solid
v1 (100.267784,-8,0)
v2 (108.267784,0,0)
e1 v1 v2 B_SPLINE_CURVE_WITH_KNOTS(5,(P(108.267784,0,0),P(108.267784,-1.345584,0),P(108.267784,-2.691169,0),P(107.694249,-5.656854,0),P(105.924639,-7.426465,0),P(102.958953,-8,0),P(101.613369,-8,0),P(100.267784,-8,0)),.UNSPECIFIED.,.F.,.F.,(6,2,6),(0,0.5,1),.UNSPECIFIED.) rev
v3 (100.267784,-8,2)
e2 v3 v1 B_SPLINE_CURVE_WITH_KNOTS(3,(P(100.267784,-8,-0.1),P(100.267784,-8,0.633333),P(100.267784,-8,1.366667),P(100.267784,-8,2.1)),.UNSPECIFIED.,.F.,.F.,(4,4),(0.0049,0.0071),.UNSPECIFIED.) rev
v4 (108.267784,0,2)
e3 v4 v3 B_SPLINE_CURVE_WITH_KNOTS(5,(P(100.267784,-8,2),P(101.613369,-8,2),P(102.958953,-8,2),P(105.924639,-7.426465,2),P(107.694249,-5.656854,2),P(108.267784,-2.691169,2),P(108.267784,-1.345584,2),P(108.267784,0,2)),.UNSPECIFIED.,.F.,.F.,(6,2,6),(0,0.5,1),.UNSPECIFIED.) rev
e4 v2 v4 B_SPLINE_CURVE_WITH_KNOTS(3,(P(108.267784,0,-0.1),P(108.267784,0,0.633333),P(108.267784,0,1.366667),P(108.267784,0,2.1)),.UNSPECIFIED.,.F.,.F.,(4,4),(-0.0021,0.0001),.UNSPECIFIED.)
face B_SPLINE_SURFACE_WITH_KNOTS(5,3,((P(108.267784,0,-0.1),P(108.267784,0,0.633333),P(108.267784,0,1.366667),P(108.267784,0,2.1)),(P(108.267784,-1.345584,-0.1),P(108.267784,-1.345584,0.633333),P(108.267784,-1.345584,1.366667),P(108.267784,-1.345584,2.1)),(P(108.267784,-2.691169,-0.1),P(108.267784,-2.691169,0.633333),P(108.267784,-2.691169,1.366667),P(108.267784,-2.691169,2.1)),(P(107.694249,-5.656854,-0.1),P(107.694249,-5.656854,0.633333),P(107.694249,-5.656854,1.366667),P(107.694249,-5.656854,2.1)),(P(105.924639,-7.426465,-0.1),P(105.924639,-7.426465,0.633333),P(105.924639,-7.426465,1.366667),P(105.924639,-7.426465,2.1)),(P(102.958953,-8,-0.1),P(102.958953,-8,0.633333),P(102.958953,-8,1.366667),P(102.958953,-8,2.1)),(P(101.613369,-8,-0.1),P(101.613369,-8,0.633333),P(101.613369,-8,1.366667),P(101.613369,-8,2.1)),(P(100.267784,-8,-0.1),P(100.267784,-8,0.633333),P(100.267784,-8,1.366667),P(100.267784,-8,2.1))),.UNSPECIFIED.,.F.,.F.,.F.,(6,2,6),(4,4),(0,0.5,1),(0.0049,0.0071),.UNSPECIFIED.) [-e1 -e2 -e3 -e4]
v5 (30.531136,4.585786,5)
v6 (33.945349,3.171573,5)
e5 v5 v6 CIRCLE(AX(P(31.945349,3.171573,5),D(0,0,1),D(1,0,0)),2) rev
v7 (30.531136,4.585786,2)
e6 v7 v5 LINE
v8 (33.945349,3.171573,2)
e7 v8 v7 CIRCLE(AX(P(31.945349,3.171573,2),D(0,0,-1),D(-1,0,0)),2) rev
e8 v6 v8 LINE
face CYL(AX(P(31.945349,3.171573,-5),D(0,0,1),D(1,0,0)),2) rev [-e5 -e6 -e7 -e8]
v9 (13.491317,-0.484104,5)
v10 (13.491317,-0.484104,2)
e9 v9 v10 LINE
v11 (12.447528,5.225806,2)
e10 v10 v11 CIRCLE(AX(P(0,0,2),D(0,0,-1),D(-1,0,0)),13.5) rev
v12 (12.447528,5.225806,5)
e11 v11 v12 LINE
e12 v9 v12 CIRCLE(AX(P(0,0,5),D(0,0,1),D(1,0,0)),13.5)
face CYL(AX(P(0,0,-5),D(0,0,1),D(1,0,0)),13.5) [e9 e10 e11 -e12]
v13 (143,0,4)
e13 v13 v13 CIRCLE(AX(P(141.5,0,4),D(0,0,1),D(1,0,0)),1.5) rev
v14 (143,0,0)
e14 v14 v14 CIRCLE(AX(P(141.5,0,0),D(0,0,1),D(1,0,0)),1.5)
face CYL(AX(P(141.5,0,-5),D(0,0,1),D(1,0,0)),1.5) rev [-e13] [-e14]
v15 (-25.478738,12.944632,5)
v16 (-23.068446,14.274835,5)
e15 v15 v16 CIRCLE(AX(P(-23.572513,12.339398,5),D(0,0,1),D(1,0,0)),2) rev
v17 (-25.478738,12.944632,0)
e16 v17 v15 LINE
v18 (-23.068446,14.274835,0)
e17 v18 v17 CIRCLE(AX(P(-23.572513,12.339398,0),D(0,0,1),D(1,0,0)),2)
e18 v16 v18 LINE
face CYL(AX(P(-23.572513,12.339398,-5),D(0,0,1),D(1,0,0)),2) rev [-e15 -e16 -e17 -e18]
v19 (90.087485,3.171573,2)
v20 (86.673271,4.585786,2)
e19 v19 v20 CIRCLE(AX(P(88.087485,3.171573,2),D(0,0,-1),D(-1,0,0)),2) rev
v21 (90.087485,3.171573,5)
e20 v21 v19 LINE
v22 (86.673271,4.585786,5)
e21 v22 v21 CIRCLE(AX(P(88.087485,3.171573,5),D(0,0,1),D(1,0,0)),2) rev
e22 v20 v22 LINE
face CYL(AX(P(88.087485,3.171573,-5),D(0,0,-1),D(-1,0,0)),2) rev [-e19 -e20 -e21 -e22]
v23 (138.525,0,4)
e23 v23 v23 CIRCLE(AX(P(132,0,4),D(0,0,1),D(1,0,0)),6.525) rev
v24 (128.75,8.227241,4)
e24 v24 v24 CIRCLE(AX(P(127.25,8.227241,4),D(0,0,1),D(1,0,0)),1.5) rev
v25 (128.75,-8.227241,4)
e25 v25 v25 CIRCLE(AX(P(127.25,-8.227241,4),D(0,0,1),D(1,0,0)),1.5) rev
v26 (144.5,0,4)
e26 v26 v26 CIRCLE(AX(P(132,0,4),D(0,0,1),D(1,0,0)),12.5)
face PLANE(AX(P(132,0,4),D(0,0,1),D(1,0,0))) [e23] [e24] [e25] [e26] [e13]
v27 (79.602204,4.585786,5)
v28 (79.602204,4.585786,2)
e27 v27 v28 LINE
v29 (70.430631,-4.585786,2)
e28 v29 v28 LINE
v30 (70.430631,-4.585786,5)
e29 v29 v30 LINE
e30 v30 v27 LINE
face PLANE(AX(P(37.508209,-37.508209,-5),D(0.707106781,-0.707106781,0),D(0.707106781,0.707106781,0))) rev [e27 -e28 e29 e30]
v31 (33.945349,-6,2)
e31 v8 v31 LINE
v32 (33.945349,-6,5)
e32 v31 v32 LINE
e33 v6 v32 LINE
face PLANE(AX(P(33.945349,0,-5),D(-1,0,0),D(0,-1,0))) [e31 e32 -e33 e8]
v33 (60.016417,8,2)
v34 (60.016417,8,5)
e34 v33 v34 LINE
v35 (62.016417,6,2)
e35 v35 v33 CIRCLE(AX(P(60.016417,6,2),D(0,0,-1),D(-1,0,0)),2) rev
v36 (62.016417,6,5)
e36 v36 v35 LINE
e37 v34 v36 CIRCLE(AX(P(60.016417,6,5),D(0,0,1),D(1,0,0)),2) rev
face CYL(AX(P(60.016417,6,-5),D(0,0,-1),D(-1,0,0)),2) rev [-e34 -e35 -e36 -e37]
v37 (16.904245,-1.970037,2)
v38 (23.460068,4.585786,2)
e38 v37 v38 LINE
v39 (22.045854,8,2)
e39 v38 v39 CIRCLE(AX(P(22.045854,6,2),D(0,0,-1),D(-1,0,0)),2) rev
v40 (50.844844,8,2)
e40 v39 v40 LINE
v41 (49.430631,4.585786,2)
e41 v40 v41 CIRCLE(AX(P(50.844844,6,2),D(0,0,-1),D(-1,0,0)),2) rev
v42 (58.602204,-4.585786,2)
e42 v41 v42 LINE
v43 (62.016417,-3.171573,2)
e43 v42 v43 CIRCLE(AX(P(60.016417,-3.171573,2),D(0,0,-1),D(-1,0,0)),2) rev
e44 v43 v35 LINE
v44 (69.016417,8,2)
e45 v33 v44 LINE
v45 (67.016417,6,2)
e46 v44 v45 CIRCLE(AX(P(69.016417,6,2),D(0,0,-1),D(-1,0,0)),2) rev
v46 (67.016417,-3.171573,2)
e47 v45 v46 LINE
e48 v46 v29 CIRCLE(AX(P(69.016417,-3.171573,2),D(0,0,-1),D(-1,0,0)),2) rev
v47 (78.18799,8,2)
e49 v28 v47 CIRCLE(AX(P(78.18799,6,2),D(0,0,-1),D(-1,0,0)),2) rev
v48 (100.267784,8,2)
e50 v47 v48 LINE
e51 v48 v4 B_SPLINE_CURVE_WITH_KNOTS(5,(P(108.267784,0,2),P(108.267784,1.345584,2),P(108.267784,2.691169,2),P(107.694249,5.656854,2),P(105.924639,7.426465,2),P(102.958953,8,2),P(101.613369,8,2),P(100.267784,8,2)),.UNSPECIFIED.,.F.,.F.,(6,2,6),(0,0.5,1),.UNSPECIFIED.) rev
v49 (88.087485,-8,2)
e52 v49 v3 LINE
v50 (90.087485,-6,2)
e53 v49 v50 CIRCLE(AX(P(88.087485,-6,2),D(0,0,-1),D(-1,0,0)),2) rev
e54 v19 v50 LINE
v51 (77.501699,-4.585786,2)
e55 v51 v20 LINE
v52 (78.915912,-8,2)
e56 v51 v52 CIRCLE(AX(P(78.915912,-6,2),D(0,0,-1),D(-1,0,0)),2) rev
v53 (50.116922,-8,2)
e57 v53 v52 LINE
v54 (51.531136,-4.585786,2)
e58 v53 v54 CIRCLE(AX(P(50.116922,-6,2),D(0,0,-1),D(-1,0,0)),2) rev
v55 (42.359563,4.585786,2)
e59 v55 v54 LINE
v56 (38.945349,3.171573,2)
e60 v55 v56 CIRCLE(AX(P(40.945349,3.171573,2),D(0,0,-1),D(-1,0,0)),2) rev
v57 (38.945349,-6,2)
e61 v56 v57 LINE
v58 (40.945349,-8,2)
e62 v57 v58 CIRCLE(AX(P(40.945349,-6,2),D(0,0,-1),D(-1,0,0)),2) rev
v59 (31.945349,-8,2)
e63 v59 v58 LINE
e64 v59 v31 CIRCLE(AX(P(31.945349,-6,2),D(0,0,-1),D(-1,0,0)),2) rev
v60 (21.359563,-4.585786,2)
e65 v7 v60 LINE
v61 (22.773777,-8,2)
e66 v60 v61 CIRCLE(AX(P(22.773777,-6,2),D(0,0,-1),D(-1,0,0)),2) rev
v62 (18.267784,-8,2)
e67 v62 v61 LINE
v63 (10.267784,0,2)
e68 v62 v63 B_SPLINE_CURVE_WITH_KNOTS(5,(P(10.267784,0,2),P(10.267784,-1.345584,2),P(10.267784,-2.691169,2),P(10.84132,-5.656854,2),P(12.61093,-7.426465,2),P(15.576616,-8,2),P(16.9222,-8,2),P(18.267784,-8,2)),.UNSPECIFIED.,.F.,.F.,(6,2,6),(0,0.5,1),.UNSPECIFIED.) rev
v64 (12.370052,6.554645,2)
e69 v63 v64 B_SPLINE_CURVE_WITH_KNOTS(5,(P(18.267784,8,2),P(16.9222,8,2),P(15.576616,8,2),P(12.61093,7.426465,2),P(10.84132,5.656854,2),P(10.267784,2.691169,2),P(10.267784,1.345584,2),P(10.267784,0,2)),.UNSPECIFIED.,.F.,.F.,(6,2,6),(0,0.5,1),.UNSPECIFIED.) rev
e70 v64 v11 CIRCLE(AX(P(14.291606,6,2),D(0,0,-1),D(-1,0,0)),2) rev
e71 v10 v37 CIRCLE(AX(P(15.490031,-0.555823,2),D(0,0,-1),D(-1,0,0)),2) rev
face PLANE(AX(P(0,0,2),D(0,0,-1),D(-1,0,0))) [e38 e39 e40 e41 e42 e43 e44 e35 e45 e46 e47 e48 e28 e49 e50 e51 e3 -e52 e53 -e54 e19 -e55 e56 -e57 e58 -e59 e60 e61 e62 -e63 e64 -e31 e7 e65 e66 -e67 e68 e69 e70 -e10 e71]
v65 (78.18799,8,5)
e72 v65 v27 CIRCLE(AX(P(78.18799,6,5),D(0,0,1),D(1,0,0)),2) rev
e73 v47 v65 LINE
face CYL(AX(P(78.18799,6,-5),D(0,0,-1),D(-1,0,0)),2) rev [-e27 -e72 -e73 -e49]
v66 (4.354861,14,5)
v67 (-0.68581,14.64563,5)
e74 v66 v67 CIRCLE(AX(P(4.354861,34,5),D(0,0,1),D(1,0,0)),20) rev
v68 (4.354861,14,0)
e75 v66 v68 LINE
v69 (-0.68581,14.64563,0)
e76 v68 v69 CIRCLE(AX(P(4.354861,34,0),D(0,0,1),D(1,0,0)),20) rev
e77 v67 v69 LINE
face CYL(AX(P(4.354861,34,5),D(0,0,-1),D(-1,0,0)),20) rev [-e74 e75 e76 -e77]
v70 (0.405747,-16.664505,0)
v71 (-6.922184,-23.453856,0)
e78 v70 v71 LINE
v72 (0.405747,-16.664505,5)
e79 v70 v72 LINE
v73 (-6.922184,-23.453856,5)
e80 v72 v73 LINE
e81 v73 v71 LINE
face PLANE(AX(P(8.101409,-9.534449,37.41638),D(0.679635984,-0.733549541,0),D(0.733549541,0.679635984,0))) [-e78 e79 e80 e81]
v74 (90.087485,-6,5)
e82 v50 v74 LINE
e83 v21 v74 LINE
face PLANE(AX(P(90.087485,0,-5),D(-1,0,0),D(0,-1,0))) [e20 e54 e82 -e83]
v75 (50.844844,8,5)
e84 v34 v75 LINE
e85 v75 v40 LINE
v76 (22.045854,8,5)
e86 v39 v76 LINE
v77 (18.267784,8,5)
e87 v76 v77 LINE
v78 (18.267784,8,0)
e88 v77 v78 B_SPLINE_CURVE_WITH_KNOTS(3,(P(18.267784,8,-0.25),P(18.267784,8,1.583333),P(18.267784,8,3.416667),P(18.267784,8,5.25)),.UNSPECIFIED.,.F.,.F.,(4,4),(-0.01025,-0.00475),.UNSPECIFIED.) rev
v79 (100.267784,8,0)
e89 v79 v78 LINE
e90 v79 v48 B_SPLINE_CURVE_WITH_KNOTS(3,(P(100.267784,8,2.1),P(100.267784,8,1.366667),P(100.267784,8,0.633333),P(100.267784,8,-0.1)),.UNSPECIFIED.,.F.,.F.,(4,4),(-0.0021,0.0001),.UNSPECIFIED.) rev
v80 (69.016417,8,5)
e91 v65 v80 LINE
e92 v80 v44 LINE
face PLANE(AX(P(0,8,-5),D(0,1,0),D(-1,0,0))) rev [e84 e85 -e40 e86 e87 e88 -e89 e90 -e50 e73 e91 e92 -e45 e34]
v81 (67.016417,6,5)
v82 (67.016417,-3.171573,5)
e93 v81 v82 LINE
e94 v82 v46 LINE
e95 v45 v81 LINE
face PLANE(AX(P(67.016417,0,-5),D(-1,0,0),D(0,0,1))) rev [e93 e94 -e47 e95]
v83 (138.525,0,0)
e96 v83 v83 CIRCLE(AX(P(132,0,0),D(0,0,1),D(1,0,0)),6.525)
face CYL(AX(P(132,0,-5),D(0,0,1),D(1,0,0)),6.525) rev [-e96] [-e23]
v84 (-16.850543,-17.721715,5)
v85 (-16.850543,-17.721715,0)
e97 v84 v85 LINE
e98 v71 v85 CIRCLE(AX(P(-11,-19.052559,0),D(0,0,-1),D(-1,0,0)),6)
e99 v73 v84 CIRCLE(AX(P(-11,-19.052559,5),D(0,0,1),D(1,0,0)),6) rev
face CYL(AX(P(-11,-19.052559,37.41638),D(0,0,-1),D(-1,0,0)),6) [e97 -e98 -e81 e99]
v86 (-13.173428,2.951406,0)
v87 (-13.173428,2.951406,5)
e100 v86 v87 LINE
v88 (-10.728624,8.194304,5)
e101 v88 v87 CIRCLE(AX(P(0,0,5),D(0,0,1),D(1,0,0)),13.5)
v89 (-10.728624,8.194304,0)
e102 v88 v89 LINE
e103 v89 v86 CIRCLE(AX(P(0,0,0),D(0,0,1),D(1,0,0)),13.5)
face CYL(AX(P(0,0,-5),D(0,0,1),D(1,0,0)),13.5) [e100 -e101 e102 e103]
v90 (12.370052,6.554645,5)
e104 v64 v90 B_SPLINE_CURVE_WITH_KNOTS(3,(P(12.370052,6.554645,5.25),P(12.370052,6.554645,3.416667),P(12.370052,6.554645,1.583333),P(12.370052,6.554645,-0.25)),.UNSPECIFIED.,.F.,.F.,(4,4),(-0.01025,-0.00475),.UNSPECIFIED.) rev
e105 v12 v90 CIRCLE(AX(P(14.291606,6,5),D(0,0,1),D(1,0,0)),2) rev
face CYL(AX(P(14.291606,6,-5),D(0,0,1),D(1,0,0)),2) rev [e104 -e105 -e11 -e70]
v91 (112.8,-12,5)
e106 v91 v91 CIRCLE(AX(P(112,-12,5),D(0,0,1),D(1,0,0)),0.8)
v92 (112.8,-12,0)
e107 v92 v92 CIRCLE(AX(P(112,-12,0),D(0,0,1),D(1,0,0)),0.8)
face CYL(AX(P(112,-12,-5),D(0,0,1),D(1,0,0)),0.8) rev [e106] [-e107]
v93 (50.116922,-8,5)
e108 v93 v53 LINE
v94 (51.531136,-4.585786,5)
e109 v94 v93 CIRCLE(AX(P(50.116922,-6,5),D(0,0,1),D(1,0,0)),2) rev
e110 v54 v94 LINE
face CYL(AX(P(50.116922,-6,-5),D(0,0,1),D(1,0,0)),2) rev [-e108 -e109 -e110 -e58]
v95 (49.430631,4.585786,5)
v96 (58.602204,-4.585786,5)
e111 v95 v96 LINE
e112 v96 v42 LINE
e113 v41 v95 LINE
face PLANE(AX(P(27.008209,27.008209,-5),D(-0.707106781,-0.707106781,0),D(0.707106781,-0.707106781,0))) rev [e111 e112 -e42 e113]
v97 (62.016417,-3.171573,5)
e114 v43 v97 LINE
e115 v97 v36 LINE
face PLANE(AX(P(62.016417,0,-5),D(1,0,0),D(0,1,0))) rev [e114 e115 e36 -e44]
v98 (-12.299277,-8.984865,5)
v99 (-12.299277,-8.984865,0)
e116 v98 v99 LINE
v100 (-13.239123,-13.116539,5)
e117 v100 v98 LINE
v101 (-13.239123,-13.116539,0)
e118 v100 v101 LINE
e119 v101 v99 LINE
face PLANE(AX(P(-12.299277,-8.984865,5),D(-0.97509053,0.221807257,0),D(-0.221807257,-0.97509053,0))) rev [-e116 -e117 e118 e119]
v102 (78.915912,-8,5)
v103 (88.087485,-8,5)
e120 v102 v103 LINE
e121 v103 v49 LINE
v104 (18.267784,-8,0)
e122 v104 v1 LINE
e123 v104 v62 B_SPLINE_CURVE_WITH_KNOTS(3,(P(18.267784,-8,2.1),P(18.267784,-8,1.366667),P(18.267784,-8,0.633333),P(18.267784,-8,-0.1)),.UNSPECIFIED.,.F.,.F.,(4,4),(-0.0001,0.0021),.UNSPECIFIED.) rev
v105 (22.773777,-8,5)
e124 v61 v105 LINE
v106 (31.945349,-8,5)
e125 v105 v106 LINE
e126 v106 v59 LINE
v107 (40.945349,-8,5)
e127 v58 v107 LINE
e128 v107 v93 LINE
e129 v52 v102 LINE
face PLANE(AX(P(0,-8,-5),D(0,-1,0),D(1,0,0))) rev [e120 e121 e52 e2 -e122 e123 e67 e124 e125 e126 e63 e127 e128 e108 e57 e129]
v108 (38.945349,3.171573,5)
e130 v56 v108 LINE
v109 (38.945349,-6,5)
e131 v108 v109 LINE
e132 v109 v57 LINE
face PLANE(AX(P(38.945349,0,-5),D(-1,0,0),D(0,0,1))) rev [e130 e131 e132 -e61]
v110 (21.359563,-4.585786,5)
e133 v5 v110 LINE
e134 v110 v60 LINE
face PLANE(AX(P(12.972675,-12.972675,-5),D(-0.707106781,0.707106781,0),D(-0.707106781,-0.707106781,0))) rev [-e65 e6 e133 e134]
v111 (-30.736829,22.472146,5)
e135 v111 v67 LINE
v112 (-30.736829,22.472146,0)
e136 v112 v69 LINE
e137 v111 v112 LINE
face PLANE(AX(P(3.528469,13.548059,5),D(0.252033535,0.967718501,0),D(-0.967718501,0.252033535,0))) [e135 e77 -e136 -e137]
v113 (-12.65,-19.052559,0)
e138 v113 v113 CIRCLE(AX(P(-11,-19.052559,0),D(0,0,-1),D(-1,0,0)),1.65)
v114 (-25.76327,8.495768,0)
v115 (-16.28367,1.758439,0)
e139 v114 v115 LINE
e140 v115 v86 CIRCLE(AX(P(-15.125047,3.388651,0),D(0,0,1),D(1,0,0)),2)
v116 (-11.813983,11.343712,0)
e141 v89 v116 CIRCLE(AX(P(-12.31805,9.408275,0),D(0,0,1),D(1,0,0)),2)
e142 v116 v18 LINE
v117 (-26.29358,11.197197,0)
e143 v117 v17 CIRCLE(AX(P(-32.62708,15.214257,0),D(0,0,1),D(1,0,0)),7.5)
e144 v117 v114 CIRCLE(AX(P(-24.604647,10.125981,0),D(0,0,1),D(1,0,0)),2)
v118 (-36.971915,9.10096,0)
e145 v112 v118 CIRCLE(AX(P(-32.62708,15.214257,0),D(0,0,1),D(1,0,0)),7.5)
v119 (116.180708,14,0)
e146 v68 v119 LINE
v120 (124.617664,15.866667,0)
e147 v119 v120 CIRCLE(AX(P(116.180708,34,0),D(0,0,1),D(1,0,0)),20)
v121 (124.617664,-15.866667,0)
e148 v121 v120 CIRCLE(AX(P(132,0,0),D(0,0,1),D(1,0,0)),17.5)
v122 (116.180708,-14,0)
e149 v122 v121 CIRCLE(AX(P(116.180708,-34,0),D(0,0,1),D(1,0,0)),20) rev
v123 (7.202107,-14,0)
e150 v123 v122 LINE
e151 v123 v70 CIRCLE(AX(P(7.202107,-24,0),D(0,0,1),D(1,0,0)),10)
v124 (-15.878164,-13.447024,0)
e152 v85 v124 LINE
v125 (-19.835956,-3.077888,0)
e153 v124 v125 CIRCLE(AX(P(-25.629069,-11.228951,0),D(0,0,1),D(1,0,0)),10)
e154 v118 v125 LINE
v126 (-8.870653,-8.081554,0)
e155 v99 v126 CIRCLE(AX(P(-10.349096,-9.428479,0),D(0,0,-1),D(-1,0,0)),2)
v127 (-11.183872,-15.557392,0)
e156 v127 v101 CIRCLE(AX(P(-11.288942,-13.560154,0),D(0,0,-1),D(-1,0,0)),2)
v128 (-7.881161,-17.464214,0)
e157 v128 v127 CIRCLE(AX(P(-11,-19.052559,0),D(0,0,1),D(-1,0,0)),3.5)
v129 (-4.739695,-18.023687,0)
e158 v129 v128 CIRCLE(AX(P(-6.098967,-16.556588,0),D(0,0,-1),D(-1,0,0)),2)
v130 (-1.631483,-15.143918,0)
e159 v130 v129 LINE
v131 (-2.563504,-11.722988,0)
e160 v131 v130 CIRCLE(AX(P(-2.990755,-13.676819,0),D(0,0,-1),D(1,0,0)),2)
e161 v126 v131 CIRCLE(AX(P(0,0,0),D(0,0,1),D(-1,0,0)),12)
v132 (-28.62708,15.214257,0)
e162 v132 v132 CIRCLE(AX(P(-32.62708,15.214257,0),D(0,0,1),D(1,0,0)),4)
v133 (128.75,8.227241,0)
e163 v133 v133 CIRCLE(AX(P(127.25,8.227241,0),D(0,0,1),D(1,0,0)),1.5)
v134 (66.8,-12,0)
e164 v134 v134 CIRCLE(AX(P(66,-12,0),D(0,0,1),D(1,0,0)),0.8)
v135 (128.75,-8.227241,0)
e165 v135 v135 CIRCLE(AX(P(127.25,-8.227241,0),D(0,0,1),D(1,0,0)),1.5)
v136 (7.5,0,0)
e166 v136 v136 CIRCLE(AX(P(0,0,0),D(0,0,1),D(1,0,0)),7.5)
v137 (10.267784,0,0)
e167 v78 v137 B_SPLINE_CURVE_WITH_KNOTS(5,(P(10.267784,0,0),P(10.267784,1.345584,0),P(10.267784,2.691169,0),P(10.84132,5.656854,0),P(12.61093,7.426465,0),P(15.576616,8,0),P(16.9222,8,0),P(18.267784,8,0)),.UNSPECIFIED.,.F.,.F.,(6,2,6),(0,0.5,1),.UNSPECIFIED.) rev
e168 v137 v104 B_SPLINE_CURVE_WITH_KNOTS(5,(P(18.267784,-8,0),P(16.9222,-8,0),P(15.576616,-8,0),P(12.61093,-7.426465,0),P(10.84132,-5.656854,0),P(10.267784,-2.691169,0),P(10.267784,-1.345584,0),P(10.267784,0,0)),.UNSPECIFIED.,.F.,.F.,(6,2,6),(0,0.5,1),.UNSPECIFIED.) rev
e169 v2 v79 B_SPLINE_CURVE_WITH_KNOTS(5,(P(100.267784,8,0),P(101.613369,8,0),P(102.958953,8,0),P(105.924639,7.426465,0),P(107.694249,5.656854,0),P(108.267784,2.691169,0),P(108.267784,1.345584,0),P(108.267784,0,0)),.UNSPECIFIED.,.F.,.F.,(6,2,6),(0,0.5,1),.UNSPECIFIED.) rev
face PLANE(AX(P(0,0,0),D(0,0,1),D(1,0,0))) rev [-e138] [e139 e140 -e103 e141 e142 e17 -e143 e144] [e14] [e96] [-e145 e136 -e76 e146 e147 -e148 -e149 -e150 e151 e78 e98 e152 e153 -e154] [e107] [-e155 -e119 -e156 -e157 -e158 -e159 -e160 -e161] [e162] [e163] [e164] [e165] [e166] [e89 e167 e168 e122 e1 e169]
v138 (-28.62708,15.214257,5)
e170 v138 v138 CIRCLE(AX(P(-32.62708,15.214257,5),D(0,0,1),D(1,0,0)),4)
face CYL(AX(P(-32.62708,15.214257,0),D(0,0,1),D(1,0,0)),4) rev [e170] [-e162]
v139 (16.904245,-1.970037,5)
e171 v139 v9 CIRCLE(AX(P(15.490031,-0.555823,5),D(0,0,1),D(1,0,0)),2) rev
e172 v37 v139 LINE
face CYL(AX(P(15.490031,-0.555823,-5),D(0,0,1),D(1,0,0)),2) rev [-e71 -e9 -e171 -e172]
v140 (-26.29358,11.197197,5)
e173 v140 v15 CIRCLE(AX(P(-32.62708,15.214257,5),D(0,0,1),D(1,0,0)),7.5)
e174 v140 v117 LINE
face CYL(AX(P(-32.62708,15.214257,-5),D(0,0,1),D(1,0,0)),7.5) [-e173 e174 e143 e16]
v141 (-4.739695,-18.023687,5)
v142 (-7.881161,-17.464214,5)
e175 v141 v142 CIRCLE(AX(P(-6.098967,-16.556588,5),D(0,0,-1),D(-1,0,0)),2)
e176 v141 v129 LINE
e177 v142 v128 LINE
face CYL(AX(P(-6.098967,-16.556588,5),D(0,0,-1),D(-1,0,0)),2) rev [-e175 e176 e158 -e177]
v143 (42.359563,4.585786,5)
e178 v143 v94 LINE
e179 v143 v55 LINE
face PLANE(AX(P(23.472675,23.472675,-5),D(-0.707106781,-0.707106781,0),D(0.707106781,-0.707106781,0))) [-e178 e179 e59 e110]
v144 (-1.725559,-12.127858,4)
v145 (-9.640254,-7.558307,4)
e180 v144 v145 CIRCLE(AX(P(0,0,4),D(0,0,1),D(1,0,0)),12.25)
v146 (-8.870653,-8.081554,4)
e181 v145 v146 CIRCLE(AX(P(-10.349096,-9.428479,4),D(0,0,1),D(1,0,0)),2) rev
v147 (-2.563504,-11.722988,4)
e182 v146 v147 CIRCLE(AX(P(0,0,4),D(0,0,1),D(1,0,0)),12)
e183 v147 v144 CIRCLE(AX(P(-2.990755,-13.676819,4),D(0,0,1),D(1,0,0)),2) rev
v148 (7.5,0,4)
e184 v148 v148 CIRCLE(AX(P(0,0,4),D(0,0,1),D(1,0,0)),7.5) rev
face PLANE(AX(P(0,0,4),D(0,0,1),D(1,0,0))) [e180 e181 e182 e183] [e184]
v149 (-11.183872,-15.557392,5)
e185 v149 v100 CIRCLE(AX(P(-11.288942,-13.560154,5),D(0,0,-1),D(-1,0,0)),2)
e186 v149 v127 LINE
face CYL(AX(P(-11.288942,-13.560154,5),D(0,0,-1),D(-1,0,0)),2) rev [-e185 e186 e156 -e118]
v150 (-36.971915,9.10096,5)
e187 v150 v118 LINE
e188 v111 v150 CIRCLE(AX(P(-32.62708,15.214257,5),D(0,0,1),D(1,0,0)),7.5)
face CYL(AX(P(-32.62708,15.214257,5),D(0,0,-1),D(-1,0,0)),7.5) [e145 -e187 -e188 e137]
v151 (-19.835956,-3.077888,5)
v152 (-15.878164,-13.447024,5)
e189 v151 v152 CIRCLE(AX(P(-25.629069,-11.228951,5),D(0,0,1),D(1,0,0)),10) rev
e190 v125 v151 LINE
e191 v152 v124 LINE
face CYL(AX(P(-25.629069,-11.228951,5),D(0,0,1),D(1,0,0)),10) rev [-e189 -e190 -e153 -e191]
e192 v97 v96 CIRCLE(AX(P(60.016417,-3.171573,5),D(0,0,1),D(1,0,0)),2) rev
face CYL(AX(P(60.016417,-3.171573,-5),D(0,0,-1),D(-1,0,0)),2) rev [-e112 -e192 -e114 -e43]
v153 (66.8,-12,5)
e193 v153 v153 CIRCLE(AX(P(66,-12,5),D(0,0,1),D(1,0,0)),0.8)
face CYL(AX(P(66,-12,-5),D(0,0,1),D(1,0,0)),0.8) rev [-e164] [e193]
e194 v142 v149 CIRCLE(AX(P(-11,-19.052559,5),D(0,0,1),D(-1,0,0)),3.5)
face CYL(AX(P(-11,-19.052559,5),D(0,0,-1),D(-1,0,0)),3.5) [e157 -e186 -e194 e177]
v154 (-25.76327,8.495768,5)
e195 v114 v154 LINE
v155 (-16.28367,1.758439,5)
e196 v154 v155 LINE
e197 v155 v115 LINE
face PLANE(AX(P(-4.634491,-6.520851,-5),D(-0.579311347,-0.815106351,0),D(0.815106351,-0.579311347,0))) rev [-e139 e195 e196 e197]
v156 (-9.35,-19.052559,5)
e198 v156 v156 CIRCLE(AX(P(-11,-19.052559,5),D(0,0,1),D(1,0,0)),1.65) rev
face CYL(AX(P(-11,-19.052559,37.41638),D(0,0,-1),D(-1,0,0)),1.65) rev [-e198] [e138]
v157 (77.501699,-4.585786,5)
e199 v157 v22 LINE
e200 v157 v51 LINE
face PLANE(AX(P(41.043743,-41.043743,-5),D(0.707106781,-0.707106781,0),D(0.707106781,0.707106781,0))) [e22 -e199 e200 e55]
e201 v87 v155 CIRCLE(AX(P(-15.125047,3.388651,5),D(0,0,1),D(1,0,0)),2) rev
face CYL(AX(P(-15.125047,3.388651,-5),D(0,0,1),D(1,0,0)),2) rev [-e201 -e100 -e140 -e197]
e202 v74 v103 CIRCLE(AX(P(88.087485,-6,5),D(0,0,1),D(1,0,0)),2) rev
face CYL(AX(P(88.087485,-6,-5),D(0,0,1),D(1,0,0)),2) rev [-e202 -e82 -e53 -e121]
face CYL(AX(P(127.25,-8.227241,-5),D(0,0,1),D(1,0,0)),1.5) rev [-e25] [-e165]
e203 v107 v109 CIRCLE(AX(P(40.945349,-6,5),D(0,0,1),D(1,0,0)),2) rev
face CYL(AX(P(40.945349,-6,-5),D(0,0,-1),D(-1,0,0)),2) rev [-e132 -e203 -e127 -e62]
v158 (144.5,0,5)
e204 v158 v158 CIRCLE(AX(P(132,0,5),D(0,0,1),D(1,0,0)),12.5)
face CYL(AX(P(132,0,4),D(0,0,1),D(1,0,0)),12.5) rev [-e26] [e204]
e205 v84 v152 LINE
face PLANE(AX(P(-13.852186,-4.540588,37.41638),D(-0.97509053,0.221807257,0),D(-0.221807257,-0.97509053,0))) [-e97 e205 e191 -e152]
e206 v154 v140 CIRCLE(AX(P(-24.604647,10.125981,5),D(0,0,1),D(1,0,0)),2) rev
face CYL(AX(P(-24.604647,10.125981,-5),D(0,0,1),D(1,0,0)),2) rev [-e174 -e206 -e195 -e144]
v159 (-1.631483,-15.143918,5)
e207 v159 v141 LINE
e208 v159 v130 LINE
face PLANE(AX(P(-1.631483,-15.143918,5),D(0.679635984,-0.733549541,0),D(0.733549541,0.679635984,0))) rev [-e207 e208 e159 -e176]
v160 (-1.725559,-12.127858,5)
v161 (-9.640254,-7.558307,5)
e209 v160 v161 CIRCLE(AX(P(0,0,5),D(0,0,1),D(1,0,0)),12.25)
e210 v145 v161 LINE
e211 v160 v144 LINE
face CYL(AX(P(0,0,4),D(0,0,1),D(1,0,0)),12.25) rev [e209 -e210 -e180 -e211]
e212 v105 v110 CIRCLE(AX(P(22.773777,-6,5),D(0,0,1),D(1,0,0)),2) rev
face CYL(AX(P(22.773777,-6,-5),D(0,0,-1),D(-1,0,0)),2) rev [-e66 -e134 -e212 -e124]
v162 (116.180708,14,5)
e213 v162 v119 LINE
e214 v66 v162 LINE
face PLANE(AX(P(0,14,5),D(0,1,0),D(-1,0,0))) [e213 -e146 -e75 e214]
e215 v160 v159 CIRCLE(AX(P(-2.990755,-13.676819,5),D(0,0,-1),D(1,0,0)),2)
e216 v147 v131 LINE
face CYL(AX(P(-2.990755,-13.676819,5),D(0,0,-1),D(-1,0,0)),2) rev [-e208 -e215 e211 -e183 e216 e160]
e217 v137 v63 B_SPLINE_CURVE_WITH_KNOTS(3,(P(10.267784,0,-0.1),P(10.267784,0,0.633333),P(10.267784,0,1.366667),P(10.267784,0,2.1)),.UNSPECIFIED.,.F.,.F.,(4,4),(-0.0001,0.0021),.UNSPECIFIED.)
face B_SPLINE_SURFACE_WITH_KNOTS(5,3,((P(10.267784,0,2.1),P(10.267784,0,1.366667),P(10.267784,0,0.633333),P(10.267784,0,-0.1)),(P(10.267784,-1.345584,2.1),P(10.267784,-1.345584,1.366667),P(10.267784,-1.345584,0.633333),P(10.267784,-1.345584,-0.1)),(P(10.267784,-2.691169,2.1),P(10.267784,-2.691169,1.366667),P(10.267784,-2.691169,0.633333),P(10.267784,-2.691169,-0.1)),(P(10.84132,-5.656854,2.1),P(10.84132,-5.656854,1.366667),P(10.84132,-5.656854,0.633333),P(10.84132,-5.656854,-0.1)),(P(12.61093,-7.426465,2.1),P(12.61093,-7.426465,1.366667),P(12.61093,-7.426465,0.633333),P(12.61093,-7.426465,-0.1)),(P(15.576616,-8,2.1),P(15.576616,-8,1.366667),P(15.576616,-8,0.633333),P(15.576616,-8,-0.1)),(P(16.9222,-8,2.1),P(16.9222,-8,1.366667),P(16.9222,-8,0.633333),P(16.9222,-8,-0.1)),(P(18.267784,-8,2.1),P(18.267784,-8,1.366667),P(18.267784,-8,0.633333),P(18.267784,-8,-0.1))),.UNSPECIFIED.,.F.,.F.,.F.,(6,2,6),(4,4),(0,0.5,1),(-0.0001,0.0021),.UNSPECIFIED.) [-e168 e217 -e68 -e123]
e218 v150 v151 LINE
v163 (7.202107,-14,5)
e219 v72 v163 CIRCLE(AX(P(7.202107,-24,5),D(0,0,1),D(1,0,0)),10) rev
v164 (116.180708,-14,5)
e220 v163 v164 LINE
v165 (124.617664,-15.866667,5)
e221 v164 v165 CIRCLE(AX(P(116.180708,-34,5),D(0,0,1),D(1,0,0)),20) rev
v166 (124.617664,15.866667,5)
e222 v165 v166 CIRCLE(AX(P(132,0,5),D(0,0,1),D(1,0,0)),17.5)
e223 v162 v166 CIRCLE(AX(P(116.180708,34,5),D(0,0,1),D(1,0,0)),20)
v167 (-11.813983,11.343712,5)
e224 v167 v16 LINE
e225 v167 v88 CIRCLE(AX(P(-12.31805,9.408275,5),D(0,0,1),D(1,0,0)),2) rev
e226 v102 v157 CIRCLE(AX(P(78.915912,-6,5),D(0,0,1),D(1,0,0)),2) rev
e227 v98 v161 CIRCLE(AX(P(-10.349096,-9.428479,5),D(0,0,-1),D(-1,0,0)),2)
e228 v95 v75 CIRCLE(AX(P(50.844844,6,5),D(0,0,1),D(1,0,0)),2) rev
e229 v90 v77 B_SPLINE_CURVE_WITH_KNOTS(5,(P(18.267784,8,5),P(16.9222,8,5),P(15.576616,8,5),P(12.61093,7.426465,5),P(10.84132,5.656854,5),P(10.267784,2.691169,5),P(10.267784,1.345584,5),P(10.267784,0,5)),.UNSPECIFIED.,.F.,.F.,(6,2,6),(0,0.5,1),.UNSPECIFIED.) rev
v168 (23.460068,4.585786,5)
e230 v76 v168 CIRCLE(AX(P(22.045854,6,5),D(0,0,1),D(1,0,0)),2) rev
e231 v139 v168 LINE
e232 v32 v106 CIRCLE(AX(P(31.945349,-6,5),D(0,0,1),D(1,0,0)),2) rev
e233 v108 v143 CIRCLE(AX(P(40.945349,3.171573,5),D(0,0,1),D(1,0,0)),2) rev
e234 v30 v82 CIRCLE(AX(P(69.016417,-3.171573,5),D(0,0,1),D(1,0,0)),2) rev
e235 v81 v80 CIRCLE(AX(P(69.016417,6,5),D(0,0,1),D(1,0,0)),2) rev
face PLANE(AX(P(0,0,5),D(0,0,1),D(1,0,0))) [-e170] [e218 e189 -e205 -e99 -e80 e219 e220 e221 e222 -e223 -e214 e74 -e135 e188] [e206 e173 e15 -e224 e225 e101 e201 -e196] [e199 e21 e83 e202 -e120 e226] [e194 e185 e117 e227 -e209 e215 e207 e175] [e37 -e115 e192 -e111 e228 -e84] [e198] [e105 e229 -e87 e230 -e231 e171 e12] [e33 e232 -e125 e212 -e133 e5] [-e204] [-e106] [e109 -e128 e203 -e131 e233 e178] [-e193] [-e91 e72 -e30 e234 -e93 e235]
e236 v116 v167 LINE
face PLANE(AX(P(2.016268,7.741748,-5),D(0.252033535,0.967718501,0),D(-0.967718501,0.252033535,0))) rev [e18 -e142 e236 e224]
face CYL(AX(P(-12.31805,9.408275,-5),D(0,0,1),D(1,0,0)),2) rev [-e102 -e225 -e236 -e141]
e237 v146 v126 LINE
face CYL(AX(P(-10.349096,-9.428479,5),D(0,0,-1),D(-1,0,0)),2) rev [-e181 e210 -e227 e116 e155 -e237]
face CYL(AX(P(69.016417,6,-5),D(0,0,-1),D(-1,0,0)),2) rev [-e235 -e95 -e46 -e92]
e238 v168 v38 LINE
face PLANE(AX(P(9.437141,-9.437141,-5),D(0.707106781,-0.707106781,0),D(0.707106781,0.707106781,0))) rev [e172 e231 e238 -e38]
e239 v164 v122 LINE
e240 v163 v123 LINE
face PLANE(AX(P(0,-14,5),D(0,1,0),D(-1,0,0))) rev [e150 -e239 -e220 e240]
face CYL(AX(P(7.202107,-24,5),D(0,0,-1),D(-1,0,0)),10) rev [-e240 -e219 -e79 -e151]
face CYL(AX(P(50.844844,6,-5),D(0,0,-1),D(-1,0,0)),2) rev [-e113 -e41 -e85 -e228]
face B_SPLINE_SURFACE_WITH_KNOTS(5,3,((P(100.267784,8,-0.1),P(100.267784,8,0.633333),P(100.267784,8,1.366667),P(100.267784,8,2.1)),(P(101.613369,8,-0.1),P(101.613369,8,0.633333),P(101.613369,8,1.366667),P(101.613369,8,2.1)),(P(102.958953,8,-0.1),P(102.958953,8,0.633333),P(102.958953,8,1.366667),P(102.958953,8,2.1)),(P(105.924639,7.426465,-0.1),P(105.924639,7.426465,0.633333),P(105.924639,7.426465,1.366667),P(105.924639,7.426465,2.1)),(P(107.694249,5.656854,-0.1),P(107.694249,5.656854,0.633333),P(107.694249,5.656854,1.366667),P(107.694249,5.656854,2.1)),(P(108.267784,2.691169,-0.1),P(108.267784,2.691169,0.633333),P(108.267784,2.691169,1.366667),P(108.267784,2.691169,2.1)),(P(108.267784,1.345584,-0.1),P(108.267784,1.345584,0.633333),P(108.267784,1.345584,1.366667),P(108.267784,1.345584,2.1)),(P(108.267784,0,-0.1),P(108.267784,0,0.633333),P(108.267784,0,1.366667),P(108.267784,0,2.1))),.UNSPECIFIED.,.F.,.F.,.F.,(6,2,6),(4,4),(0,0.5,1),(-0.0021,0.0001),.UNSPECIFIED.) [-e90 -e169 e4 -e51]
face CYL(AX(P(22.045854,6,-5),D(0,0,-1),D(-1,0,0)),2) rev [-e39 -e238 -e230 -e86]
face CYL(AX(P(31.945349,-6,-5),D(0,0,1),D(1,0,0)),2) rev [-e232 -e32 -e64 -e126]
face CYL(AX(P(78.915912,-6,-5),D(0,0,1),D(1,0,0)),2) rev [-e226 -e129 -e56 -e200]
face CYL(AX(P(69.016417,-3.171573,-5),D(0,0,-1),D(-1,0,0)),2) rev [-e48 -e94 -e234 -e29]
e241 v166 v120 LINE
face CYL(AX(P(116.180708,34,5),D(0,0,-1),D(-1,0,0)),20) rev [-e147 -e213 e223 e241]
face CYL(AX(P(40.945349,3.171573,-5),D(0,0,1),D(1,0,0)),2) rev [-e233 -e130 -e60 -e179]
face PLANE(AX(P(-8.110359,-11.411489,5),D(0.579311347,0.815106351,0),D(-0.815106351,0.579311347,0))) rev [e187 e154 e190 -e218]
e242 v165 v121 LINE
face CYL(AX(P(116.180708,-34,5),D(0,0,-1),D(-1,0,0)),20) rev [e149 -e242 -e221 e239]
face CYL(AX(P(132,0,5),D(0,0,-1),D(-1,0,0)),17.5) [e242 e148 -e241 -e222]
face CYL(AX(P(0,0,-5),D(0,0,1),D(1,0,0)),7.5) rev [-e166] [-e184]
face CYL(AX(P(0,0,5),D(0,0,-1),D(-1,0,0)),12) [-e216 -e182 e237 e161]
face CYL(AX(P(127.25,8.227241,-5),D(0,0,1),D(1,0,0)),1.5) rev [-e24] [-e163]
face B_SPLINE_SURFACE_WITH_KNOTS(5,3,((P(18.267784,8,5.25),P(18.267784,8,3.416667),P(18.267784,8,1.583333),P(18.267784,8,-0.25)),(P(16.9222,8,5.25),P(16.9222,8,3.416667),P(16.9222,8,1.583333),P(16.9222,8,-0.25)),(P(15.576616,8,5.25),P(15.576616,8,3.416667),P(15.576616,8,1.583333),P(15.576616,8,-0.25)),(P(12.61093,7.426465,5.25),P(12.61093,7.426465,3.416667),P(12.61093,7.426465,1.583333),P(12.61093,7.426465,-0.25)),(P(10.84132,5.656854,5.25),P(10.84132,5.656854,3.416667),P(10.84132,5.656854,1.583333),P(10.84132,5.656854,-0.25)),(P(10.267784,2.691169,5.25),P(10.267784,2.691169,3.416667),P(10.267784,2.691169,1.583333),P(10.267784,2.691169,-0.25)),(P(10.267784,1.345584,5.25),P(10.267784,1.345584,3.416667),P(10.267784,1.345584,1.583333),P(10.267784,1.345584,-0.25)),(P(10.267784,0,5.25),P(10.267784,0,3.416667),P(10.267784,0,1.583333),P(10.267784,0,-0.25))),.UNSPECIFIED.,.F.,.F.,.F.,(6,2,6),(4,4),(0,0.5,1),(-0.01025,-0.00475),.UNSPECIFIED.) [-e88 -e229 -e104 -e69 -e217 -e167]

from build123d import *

# Parameters (mm, degrees)
EXTRUDE_1_DEPTH      = 5
SKETCH_2_R           = 4
CUT_EXTRUDE_1_DEPTH  = 5
SKETCH_3_R           = 7.5
CUT_EXTRUDE_2_DEPTH  = 10
CUT_EXTRUDE_START    = -10
CUT_EXTRUDE_3_DEPTH  = 10
CUT_EXTRUDE_4_DEPTH  = 10
FILLET_1_R           = 2
SKETCH_6_R           = 6.525
CUT_EXTRUDE_5_DEPTH  = 10
SKETCH_8_R           = 1.5
CUT_EXTRUDE_7_DEPTH  = 10
SKETCH_11_R          = 0.8
CUT_EXTRUDE_8_DEPTH  = 10
SKETCH_13_R          = 1.65
EXTRUDE_3_DEPTH      = 5
FILLET_3_R           = 10
CUT_EXTRUDE_9_DEPTH  = 5
SKETCH_16_W          = 48
SKETCH_16_H          = 16
SKETCH_16_W_2        = 50
CUT_EXTRUDE_10_DEPTH = 2
FILLET_4_SIZE        = 8
SKETCH_17_R          = 12.5
SKETCH_17_R_2        = 12.25
CUT_EXTRUDE_11_DEPTH = 1


with BuildPart() as part:
    # 草图1 → 凸台-拉伸1 (new body)
    with BuildSketch(Plane.XY):
        with BuildLine():
            Line((-30.736828822, 22.472146181), (-0.685809887, 14.645629979))
            ThreePointArc((-0.685809887, 14.645629979), (1.813935823, 14.162064114), (4.35486081, 14))
            Line((4.35486081, 14), (116.18070798, 14))
            ThreePointArc((116.18070798, 14), (120.501201779, 14.472241979), (124.617663724, 15.866666667))
            ThreePointArc((124.617663724, 15.866666667), (149.5, 0), (124.617663724, -15.866666667))
            ThreePointArc((124.617663724, -15.866666667), (120.501201779, -14.472241979), (116.18070798, -14))
            Line((116.18070798, -14), (0, -14))
            ThreePointArc((0, -14), (-4.256709716, -13.337181951), (-8.110358856, -11.411488914))
            Line((-8.110358856, -11.411488914), (-36.971915435, 9.10095979))
            ThreePointArc((-36.971915435, 9.10095979), (-39.424388736, 18.383894386), (-30.736828822, 22.472146181))
        make_face()
    extrude(amount=EXTRUDE_1_DEPTH)

    # 草图2 → 切除-拉伸1 (cut)
    with BuildSketch(Plane.XY.offset(5)):
        with Locations((-32.627080333, 15.214257423)):
            Circle(SKETCH_2_R)
    extrude(amount=-CUT_EXTRUDE_1_DEPTH, mode=Mode.SUBTRACT)

    # 草图3 → 切除-拉伸2 (cut)
    with BuildSketch(Plane.XY.offset(5)):
        Circle(SKETCH_3_R)
    extrude(amount=-CUT_EXTRUDE_2_DEPTH, mode=Mode.SUBTRACT)

    # 草图4 → 切除-拉伸3 (cut)
    with BuildSketch(Plane.XY.offset(5).offset(CUT_EXTRUDE_START)):
        with BuildLine():
            ThreePointArc((-13.498186757, -0.221256097), (-12.235155125, 5.705346533), (-8.506975197, 10.482431635))
            Line((-8.506975197, 10.482431635), (-25.137780404, 14.813774499))
            ThreePointArc((-25.137780404, 14.813774499), (-25.829771931, 12.04462046), (-27.506263415, 9.73454629))
            Line((-27.506263415, 9.73454629), (-13.498186757, -0.221256097))
        make_face()
    extrude(amount=CUT_EXTRUDE_3_DEPTH, mode=Mode.SUBTRACT)

    # 草图5 → 切除-拉伸4 (cut)
    with BuildSketch(Plane.XY.offset(5).offset(CUT_EXTRUDE_START)):
        Polygon((33.945349397, 8), (17.945349397, -8), (33.945349397, -8), align=None)
        with BuildLine():
            ThreePointArc((13.5, 0), (12.826784504, -4.209940534), (10.874281585, -8))
            Line((10.874281585, -8), (26.874281585, 8))
            Line((26.874281585, 8), (10.874281585, 8))
            ThreePointArc((10.874281585, 8), (12.826784504, 4.209940534), (13.5, 0))
        make_face()
        Polygon((54.945349397, -8), (38.945349397, 8), (38.945349397, -8), align=None)
        Polygon((62.016417209, 8), (46.016417209, 8), (62.016417209, -8), align=None)
        Polygon((83.016417209, 8), (67.016417209, 8), (67.016417209, -8), align=None)
        Polygon((90.087485021, 8), (74.087485021, -8), (90.087485021, -8), align=None)
    extrude(amount=CUT_EXTRUDE_4_DEPTH, mode=Mode.SUBTRACT)

    # 圆角1
    fillet_1_edges = [part.edges().sort_by_distance(p)[0] for p in [
        (38.945349397, 8, 2.5),
        (54.945349397, -8, 2.5),
        (38.945349397, -8, 2.5),
        (10.874281585, -8, 2.5),
        (10.874281585, 8, 2.5),
        (26.874281585, 8, 2.5),
        (90.087485021, 8, 2.5),
        (90.087485021, -8, 2.5),
        (74.087485021, -8, 2.5),
        (17.945349397, -8, 2.5),
        (33.945349397, 8, 2.5),
        (33.945349397, -8, 2.5),
        (-27.506263415, 9.73454629, 2.5),
        (-25.137780404, 14.813774499, 2.5),
        (-8.506975197, 10.482431635, 2.5),
        (-13.498186757, -0.221256097, 2.5),
        (67.016417209, -8, 2.5),
        (67.016417209, 8, 2.5),
        (83.016417209, 8, 2.5),
        (62.016417209, -8, 2.5),
        (46.016417209, 8, 2.5),
        (62.016417209, 8, 2.5),
    ]]
    fillet(fillet_1_edges, radius=FILLET_1_R)

    # 草图6 → 切除-拉伸5 (cut)
    with BuildSketch(Plane.XY.offset(5)):
        with Locations((132, 0)):
            Circle(SKETCH_6_R)
    extrude(amount=-CUT_EXTRUDE_5_DEPTH, mode=Mode.SUBTRACT)

    # 草图8 → 切除-拉伸7 (cut)
    with BuildSketch(Plane.XY.offset(5)):
        with Locations((141.5, 0)):
            Circle(SKETCH_8_R)
        with Locations((127.25, -8.227241336)):
            Circle(SKETCH_8_R)
        with Locations((127.25, 8.227241336)):
            Circle(SKETCH_8_R)
    extrude(amount=-CUT_EXTRUDE_7_DEPTH, mode=Mode.SUBTRACT)

    # 草图11 → 切除-拉伸8 (cut)
    with BuildSketch(Plane.XY.offset(5)):
        with Locations((66, -12)):
            Circle(SKETCH_11_R)
        with Locations((112, -12)):
            Circle(SKETCH_11_R)
    extrude(amount=-CUT_EXTRUDE_8_DEPTH, mode=Mode.SUBTRACT)

    # 草图13 → 凸台-拉伸3 (add)
    with BuildSketch(Plane(origin=(0, 0, 0), x_dir=(-1, 0, 0), z_dir=(0, 0, -1))):
        with BuildLine():
            Line((13.852186046, -4.540588259), (-8.101408935, -9.534449379))
            Line((-8.101408935, -9.534449379), (6.922184096, -23.45385613))
            ThreePointArc((6.922184096, -23.45385613), (14, -24.248711306), (16.850543177, -17.721715341))
            Line((16.850543177, -17.721715341), (13.852186046, -4.540588259))
        make_face()
        with Locations((11, -19.052558883)):
            Circle(SKETCH_13_R, mode=Mode.SUBTRACT)
    extrude(amount=-EXTRUDE_3_DEPTH)

    # 圆角3
    fillet_3_edges = [part.edges().sort_by_distance(p)[0] for p in [
        (3.281619098, -14, 2.5),
        (-14.398527657, -6.942369598, 2.5),
    ]]
    fillet(fillet_3_edges, radius=FILLET_3_R)

    # 草图15 → 切除-拉伸9 (cut)
    with BuildSketch(Plane(origin=(0, 0, 0), x_dir=(-1, 0, 0), z_dir=(0, 0, -1))):
        with BuildLine():
            Line((1.631482745, -15.143918385), (4.739694736, -18.023686685))
            ThreePointArc((4.739694736, -18.023686685), (6.449635066, -18.525605556), (7.88116063, -17.464213523))
            ThreePointArc((7.88116063, -17.464213523), (9.25, -16.02146997), (11.183872253, -15.557392078))
            ThreePointArc((11.183872253, -15.557392078), (12.818827499, -14.848350591), (13.239123171, -13.11653939))
            Line((13.239123171, -13.11653939), (12.299276662, -8.984864696))
            ThreePointArc((12.299276662, -8.984864696), (10.858631775, -7.494474843), (8.870653374, -8.081553608))
            ThreePointArc((8.870653374, -8.081553608), (6, -10.392304845), (2.56350404, -11.722987974))
            ThreePointArc((2.56350404, -11.722987974), (1.061089715, -13.151088389), (1.631482745, -15.143918385))
        make_face()
    extrude(amount=-CUT_EXTRUDE_9_DEPTH, mode=Mode.SUBTRACT)

    # 草图16 → 切除-拉伸10 (cut)
    with BuildSketch(Plane(origin=(0, 0, 0), x_dir=(-1, 0, 0), z_dir=(0, 0, -1))):
        with Locations((-84.267784395, 0)):
            Rectangle(SKETCH_16_W, SKETCH_16_H)
        with Locations((-35.267784395, 0)):
            Rectangle(SKETCH_16_W_2, SKETCH_16_H)
    extrude(amount=-CUT_EXTRUDE_10_DEPTH, mode=Mode.SUBTRACT)

    # 圆角4
    # a fillet whose section is not a circle: 8 mm, written as the material it adds along each edge
    with BuildSketch(Plane(origin=(108.267784395, 8, 0), x_dir=(-1, 0, 0), z_dir=(0, 0, 1)), Plane(origin=(108.267784395, -8, 0), x_dir=(0, 1, 0), z_dir=(0, 0, 1))) as fillet_4_piece_1:
        with BuildLine():
            add(Edge.make_bspline([(FILLET_4_SIZE, 0), (FILLET_4_SIZE * 0.831801948466, 0), (FILLET_4_SIZE * 0.663603896932, 0), (FILLET_4_SIZE * 0.292893218813, FILLET_4_SIZE * 0.0716919198361), (FILLET_4_SIZE * 0.0716919198361, FILLET_4_SIZE * 0.292893218813), (0, FILLET_4_SIZE * 0.663603896932), (0, FILLET_4_SIZE * 0.831801948466), (0, FILLET_4_SIZE)], knots=[0, 0, 0, 0, 0, 0, 0.5, 0.5, 1, 1, 1, 1, 1, 1], degree=5))
            Line((0, FILLET_4_SIZE), (0, 0))
            Line((0, 0), (FILLET_4_SIZE, 0))
        make_face()
    extrude(amount=2)
    with BuildSketch(Plane(origin=(10.267784395, -8, 0), x_dir=(0, 1, 0), z_dir=(0, 0, 1))) as fillet_4_piece_2:
        with BuildLine():
            add(Edge.make_bspline([(FILLET_4_SIZE, 0), (FILLET_4_SIZE * 0.831801948466, 0), (FILLET_4_SIZE * 0.663603896932, 0), (FILLET_4_SIZE * 0.292893218813, -FILLET_4_SIZE * 0.0716919198361), (FILLET_4_SIZE * 0.0716919198361, -FILLET_4_SIZE * 0.292893218813), (0, -FILLET_4_SIZE * 0.663603896932), (0, -FILLET_4_SIZE * 0.831801948466), (0, -FILLET_4_SIZE)], knots=[0, 0, 0, 0, 0, 0, 0.5, 0.5, 1, 1, 1, 1, 1, 1], degree=5))
            Line((0, -FILLET_4_SIZE), (0, 0))
            Line((0, 0), (FILLET_4_SIZE, 0))
        make_face()
    extrude(amount=2)
    with BuildSketch(Plane(origin=(10.267784395, 8, 0), x_dir=(0, -1, 0), z_dir=(0, 0, 1))) as fillet_4_piece_3_section:
        with BuildLine():
            add(Edge.make_bspline([(FILLET_4_SIZE, 0), (FILLET_4_SIZE * 0.831801948466, 0), (FILLET_4_SIZE * 0.663603896932, 0), (FILLET_4_SIZE * 0.292893218813, FILLET_4_SIZE * 0.0716919198361), (FILLET_4_SIZE * 0.0716919198361, FILLET_4_SIZE * 0.292893218813), (0, FILLET_4_SIZE * 0.663603896932), (0, FILLET_4_SIZE * 0.831801948466), (0, FILLET_4_SIZE)], knots=[0, 0, 0, 0, 0, 0, 0.5, 0.5, 1, 1, 1, 1, 1, 1], degree=5))
            Line((0, FILLET_4_SIZE), (0, 0))
            Line((0, 0), (FILLET_4_SIZE, 0))
        make_face()
    fillet_4_piece_3 = extrude(amount=22, mode=Mode.PRIVATE)
    fillet_4_piece_3 = split(fillet_4_piece_3, bisect_by=Plane(origin=(10.267784395, 8, 5), z_dir=(0, 0, -1)), keep=Keep.TOP, mode=Mode.PRIVATE)
    add(fillet_4_piece_3)

    # 草图17 → 切除-拉伸11 (cut)
    with BuildSketch(Plane.XY.offset(5)):
        with Locations((132, 0)):
            Circle(SKETCH_17_R)
        Circle(SKETCH_17_R_2)
    extrude(amount=-CUT_EXTRUDE_11_DEPTH, mode=Mode.SUBTRACT)


solid = part.part
